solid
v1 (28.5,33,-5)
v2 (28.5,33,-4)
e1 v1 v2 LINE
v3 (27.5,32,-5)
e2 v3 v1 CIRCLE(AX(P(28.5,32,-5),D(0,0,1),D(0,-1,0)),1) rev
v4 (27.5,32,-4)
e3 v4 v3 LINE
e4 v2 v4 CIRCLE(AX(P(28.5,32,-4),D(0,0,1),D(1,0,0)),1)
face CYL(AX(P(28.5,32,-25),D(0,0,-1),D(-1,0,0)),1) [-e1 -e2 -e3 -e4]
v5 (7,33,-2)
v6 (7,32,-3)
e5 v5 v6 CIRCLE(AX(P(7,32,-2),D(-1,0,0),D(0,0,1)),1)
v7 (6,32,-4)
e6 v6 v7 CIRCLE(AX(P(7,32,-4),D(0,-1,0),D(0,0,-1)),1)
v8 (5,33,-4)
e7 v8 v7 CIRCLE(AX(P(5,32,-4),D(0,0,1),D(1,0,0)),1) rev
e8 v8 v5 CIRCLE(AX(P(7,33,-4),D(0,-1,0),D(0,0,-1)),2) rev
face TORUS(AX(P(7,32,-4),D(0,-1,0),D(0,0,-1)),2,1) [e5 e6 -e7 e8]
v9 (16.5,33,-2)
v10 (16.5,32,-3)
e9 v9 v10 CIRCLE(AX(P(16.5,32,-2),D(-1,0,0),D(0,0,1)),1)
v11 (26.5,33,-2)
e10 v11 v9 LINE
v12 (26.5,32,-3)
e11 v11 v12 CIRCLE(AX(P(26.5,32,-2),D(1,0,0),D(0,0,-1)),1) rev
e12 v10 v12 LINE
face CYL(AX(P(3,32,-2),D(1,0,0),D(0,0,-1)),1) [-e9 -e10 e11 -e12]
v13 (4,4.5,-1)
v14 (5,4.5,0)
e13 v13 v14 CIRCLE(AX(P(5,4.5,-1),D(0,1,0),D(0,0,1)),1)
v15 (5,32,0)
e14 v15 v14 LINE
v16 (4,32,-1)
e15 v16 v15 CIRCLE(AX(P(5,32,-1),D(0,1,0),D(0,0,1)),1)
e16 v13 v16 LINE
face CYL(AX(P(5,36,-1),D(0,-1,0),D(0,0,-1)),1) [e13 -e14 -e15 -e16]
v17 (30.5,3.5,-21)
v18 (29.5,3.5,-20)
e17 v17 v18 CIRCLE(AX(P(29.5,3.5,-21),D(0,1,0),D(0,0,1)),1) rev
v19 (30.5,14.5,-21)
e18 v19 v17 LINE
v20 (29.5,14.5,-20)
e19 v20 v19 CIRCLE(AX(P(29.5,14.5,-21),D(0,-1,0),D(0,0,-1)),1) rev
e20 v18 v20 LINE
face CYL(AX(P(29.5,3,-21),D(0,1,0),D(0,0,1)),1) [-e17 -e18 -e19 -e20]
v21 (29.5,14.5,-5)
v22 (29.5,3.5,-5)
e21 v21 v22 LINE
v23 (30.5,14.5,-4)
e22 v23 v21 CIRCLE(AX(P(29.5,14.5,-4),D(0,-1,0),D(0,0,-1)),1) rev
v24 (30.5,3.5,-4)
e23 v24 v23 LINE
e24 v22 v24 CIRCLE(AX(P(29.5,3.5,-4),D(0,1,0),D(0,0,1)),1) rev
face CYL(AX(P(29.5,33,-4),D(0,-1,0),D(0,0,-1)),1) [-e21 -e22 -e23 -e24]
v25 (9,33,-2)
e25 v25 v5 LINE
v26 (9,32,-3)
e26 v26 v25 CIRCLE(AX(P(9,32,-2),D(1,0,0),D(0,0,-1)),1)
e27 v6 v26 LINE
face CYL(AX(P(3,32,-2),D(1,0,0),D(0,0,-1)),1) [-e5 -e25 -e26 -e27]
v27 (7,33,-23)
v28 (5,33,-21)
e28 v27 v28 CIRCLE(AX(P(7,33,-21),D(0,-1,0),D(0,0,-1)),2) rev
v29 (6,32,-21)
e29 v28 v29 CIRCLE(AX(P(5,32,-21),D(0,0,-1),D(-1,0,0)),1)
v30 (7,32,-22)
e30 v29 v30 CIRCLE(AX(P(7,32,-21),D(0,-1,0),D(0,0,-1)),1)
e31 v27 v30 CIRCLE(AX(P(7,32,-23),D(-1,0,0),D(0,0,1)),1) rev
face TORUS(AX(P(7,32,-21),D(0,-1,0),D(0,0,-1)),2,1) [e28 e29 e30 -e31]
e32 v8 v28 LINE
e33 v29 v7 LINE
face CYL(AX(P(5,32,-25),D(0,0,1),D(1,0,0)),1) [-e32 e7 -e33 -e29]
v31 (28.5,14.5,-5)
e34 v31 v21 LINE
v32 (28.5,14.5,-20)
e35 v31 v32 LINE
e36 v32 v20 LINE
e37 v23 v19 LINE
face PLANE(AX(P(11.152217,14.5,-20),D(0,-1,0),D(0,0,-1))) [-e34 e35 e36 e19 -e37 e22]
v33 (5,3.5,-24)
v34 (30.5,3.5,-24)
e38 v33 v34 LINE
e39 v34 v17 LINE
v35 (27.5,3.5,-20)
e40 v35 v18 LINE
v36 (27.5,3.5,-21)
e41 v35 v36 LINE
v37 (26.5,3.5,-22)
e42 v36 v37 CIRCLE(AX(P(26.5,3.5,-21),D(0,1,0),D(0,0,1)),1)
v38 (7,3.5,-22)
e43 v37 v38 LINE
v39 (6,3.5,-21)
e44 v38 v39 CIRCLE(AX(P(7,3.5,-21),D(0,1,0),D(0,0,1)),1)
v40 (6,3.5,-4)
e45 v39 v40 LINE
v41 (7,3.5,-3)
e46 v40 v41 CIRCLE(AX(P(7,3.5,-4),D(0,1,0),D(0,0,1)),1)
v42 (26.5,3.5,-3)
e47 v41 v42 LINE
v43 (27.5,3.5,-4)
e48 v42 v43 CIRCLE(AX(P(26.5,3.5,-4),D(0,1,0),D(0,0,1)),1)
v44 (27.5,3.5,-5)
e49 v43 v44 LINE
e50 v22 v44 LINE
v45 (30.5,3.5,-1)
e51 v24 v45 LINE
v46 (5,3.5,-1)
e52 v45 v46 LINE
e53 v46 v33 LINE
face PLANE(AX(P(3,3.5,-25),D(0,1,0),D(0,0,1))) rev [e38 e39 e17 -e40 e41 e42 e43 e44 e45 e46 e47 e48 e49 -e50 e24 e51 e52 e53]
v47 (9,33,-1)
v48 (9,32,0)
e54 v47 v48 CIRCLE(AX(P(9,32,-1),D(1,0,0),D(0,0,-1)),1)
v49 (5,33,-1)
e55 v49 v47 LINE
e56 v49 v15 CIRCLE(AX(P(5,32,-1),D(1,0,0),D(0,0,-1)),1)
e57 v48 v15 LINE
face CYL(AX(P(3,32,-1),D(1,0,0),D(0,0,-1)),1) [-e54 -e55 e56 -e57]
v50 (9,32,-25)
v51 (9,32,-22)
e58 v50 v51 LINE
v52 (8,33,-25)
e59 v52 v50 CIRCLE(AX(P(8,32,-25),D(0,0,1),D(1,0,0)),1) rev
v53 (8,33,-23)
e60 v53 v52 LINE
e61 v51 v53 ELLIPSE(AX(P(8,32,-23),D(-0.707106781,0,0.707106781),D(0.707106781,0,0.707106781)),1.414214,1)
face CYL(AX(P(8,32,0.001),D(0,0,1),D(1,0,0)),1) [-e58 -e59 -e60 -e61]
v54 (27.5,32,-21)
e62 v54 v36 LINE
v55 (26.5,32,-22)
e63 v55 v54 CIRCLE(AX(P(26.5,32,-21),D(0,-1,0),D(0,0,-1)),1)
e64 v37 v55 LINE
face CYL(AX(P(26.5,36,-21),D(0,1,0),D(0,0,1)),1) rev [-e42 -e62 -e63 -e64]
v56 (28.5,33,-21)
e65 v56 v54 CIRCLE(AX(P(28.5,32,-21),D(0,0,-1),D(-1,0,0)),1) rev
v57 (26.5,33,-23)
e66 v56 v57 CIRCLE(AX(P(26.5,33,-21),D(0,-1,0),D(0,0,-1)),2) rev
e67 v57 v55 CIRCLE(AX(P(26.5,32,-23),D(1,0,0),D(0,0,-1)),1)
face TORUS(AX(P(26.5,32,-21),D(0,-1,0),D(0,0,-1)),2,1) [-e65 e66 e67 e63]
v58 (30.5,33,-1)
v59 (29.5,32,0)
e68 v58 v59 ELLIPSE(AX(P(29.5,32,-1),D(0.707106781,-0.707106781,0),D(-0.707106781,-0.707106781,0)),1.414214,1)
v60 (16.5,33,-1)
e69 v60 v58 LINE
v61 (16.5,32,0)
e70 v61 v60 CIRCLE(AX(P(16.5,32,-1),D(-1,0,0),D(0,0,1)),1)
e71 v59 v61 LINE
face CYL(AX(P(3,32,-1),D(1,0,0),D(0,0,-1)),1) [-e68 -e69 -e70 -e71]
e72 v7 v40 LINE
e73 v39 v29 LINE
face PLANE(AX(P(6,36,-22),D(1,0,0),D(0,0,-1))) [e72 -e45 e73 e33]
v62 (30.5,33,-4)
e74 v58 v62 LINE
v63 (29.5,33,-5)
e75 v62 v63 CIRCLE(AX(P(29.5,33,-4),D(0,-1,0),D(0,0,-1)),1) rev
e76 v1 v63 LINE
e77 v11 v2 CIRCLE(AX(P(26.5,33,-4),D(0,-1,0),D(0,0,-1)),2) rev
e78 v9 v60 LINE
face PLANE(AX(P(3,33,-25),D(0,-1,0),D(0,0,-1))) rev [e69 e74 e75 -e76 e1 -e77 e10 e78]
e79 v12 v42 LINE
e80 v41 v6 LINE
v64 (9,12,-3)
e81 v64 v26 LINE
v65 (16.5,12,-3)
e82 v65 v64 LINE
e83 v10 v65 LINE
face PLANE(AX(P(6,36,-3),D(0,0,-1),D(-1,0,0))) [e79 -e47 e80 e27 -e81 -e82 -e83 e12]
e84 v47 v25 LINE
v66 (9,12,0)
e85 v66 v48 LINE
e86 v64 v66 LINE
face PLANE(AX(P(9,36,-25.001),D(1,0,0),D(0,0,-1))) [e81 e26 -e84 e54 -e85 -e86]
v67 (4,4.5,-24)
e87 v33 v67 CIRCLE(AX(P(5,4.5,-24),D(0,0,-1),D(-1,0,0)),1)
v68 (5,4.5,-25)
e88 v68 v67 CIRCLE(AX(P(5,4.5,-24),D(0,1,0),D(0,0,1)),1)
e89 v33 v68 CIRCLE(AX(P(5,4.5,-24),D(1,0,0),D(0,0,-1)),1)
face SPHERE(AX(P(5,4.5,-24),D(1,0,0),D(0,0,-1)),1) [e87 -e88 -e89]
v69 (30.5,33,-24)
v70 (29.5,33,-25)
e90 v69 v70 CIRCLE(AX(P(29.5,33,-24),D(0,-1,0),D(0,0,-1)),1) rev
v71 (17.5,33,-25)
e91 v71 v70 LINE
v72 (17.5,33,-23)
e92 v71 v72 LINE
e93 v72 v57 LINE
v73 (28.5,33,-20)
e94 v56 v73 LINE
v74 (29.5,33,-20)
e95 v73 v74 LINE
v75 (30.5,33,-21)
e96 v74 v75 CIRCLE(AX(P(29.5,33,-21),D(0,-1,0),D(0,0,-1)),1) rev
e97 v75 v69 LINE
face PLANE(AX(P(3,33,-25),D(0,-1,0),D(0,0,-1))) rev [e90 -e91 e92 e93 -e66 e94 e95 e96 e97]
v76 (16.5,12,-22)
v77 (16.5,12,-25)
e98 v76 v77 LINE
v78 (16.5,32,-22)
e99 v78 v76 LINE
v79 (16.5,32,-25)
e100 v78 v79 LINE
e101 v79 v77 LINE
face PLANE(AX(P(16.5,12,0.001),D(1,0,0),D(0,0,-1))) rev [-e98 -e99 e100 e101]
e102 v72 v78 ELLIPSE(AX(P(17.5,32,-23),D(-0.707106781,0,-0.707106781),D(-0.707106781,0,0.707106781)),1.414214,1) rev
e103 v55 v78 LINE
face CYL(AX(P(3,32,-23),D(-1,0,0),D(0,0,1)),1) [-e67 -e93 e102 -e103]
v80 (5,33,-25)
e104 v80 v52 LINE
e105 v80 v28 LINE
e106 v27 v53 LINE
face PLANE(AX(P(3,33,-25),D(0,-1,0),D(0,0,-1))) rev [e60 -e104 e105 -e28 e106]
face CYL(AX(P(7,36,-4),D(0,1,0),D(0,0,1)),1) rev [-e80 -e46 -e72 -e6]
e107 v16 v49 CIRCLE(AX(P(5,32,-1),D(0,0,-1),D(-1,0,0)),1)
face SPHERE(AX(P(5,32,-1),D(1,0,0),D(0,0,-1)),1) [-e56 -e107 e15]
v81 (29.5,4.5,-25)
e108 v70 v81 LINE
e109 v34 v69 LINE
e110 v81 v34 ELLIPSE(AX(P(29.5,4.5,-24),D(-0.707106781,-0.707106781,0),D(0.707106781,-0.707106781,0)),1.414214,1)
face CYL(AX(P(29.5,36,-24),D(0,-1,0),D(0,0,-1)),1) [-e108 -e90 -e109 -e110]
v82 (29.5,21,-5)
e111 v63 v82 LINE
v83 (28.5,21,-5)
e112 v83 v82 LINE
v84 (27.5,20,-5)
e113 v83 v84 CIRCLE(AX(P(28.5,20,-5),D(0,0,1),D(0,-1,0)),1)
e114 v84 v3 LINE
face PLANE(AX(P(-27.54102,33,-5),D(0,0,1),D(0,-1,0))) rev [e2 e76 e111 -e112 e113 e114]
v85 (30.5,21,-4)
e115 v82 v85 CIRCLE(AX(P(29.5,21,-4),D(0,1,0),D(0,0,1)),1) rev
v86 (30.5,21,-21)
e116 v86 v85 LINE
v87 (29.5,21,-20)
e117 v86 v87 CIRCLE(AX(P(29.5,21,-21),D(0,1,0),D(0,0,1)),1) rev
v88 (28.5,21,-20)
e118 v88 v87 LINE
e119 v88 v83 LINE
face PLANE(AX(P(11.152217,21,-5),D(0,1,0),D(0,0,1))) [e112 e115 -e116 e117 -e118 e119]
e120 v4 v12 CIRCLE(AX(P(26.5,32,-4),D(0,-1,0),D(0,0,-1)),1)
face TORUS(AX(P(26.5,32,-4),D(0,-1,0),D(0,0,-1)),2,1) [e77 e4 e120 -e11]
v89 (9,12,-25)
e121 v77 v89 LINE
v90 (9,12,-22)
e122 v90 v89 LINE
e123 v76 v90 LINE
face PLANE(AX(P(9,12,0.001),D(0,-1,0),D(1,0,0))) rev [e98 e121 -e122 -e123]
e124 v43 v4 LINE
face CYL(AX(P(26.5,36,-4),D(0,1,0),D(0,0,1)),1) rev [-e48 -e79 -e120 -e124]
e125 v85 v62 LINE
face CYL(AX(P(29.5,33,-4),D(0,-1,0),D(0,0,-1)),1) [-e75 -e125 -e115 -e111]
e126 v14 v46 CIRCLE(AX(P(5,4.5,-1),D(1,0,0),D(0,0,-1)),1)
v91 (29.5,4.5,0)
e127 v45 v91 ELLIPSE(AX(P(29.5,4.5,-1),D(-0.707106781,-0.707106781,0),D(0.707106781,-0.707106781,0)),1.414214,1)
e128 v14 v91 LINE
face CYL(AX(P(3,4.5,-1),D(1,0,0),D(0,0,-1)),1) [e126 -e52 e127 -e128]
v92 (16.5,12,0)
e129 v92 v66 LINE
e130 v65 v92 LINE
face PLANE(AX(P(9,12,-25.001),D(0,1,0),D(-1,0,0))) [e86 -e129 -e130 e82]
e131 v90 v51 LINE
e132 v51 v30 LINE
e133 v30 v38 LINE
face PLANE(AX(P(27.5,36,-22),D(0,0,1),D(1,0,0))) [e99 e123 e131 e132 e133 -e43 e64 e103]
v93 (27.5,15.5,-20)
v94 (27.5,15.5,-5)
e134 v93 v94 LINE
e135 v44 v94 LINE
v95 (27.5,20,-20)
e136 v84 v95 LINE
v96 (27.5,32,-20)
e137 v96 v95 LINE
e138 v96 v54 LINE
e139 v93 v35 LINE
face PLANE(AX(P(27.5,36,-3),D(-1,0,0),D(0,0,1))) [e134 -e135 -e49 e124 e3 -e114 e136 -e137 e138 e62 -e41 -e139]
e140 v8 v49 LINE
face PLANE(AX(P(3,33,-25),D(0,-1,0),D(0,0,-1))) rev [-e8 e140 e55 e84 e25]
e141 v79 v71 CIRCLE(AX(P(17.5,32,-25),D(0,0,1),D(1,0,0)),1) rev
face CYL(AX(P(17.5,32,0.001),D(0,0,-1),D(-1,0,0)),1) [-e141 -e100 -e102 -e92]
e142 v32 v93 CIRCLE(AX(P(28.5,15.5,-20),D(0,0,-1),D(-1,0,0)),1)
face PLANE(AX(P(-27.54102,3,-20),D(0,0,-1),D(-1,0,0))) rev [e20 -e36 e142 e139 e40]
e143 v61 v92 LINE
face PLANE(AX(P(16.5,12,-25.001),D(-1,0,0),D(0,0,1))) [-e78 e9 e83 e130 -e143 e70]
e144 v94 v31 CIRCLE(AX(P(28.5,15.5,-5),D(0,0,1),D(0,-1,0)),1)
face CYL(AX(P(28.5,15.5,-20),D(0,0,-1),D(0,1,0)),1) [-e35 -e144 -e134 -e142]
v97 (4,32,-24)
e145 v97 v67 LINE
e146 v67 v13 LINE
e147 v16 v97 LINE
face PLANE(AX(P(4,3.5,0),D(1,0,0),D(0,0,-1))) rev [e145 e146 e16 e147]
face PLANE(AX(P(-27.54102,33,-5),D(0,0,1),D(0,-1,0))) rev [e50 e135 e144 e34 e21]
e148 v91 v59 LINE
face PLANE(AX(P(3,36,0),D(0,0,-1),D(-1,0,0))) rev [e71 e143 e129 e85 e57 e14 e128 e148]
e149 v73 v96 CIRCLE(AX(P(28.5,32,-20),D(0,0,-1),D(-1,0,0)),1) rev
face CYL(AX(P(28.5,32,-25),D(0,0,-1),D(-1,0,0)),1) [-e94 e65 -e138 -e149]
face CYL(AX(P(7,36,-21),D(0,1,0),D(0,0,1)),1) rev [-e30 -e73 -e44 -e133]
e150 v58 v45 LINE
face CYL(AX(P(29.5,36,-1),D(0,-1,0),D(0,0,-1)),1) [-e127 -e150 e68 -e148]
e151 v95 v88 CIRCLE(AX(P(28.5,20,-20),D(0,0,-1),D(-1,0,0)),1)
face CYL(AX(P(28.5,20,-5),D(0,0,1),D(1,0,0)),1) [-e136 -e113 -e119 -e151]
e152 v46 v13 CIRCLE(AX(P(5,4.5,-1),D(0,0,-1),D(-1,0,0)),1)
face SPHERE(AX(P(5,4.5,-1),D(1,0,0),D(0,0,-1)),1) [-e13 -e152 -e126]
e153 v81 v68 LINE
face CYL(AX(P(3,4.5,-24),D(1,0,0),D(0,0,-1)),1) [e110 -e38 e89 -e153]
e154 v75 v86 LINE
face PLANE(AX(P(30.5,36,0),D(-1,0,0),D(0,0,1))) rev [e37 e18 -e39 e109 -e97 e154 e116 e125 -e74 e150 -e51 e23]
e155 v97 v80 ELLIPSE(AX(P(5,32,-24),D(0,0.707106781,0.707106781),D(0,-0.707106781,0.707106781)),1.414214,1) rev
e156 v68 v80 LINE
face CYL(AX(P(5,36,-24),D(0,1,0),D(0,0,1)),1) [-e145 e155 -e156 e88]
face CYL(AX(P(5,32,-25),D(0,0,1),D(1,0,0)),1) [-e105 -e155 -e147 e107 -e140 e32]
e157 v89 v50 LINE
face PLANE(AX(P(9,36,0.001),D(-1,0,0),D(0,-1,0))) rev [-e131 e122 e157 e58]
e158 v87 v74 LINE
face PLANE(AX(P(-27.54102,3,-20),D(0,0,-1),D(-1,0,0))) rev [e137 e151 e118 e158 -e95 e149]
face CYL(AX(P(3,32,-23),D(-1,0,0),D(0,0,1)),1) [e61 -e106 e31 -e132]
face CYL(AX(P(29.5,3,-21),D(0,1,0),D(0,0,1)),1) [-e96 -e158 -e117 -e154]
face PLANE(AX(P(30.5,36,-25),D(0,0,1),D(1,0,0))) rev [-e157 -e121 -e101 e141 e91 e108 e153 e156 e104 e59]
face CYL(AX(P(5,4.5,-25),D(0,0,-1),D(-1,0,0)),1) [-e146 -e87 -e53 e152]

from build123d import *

# Parameters (mm, degrees)
SKETCH_1_W          = 27.5
SKETCH_1_H          = 25
SKETCH_1_W_2        = 21.5
SKETCH_1_H_2        = 19
EXTRUDE_1_DEPTH     = 36
SKETCH_3_W          = 15
SKETCH_3_H          = 30
CUT_EXTRUDE_1_DEPTH = 24.5
CUT_EXTRUDE_2_REACH = 55.397
SKETCH_4_W          = 7.5
SKETCH_4_H          = 24
SKETCH_5_W          = 25
SKETCH_5_H          = 3
SKETCH_5_H_2        = 3.5
CUT_EXTRUDE_3_DEPTH = 52.742149163
SKETCH_6_W          = 15
SKETCH_6_H          = 6.5
EXTRUDE_2_DEPTH     = 3
FILLET_1_R          = 1
SKETCH_7_W          = 1
SKETCH_7_H          = 25
CUT_EXTRUDE_5_DEPTH = 50.249365478
FILLET_3_R          = 1


with BuildPart() as part:
    # 草图1 → 凸台-拉伸1 (new body)
    with BuildSketch(Plane(origin=(0, 0, 0), x_dir=(1, 0, 0), z_dir=(0, 1, 0))):
        with Locations((16.75, 12.5)):
            Rectangle(SKETCH_1_W, SKETCH_1_H)
        with Locations((16.75, 12.5)):
            Rectangle(SKETCH_1_W_2, SKETCH_1_H_2, mode=Mode.SUBTRACT)
    extrude(amount=EXTRUDE_1_DEPTH)

    # 草图3 → 切除-拉伸1 (cut)
    with BuildSketch(Plane(origin=(30.5, 0, 0), x_dir=(0, 0, -1), z_dir=(1, 0, 0))):
        with Locations((12.5, 18)):
            Rectangle(SKETCH_3_W, SKETCH_3_H)
    extrude(amount=-CUT_EXTRUDE_1_DEPTH, mode=Mode.SUBTRACT)

    # 草图4 → 切除-拉伸2 (cut, up to next)
    with BuildSketch(Plane(origin=(0, 0, -25), x_dir=(-1, 0, 0), z_dir=(0, 0, -1)), mode=Mode.PRIVATE) as cut_extrude_2_sk1:
        with Locations((-12.75, 24)):
            Rectangle(SKETCH_4_W, SKETCH_4_H)
    cut_extrude_2_tool1 = extrude(cut_extrude_2_sk1.sketch, amount=-CUT_EXTRUDE_2_REACH, mode=Mode.PRIVATE) & part.part
    cut_extrude_2 = cut_extrude_2_tool1.solids().sort_by_distance((12.75, 24, -25))[0]
    add(cut_extrude_2, mode=Mode.SUBTRACT)

    # 草图5 → 切除-拉伸3 (cut, through all)
    with BuildSketch(Plane(origin=(30.5, 0, 0), x_dir=(0, 0, -1), z_dir=(1, 0, 0))):
        with Locations((12.5, 34.5)):
            Rectangle(SKETCH_5_W, SKETCH_5_H)
        with Locations((12.5, 1.75)):
            Rectangle(SKETCH_5_W, SKETCH_5_H_2)
    extrude(amount=-CUT_EXTRUDE_3_DEPTH, mode=Mode.SUBTRACT)

    # 草图6 → 凸台-拉伸2 (add)
    with BuildSketch(Plane(origin=(30.5, 0, 0), x_dir=(0, 0, -1), z_dir=(1, 0, 0))):
        with Locations((12.5, 17.75)):
            Rectangle(SKETCH_6_W, SKETCH_6_H)
    extrude(amount=-EXTRUDE_2_DEPTH)

    # 圆角1
    fillet_1_edges = [part.edges().sort_by_distance(p)[0] for p in [
        (30.5, 9, -5),
        (30.5, 27, -20),
        (27.5, 14.5, -12.5),
        (27.5, 21, -12.5),
        (30.5, 27, -5),
        (16.5, 33, -23.5),
        (30.5, 9, -20),
        (6, 18.25, -3),
        (27.5, 18.25, -3),
        (6, 18.25, -22),
        (27.5, 18.25, -22),
        (30.5, 18.25, 0),
        (3, 18.25, 0),
        (3, 18.25, -25),
        (30.5, 18.25, -25),
        (3, 33, -12.5),
        (9, 33, -23.5),
        (27.5, 33, -21),
        (27.5, 33, -4),
        (16.75, 33, -3),
        (6, 33, -12.5),
        (7.5, 33, -22),
        (22, 33, -22),
        (16.75, 33, 0),
        (3, 3.5, -12.5),
        (16.75, 3.5, 0),
        (16.75, 3.5, -25),
    ]]
    fillet(fillet_1_edges, radius=FILLET_1_R)

    # 草图7 → 切除-拉伸5 (cut, through all)
    with BuildSketch(Plane(origin=(0, 33, 0), x_dir=(1, 0, 0), z_dir=(0, 1, 0))):
        with Locations((3.5, 12.5)):
            Rectangle(SKETCH_7_W, SKETCH_7_H)
    extrude(amount=-CUT_EXTRUDE_5_DEPTH, mode=Mode.SUBTRACT)

    # 圆角3
    fillet_3_edges = [part.edges().sort_by_distance(p)[0] for p in [
        (4, 33, -13),
        (4, 18.75, -25),
        (4, 3.5, -12.5),
        (4, 18.25, 0),
        (4, 32.707106781, -0.292893219),
        (4, 3.792893219, -24.707106781),
        (4, 3.792893219, -0.292893219),
    ]]
    fillet(fillet_3_edges, radius=FILLET_3_R - 0.0001)  # a hair under: the kernel refuses the full size

    # 镜向1: 切除-拉伸2 across plane
    add(cut_extrude_2.mirror(Plane(origin=(0, 0, -12.5), x_dir=(1, 0, 0), z_dir=(0, 0, -1))), mode=Mode.SUBTRACT)


solid = part.part
